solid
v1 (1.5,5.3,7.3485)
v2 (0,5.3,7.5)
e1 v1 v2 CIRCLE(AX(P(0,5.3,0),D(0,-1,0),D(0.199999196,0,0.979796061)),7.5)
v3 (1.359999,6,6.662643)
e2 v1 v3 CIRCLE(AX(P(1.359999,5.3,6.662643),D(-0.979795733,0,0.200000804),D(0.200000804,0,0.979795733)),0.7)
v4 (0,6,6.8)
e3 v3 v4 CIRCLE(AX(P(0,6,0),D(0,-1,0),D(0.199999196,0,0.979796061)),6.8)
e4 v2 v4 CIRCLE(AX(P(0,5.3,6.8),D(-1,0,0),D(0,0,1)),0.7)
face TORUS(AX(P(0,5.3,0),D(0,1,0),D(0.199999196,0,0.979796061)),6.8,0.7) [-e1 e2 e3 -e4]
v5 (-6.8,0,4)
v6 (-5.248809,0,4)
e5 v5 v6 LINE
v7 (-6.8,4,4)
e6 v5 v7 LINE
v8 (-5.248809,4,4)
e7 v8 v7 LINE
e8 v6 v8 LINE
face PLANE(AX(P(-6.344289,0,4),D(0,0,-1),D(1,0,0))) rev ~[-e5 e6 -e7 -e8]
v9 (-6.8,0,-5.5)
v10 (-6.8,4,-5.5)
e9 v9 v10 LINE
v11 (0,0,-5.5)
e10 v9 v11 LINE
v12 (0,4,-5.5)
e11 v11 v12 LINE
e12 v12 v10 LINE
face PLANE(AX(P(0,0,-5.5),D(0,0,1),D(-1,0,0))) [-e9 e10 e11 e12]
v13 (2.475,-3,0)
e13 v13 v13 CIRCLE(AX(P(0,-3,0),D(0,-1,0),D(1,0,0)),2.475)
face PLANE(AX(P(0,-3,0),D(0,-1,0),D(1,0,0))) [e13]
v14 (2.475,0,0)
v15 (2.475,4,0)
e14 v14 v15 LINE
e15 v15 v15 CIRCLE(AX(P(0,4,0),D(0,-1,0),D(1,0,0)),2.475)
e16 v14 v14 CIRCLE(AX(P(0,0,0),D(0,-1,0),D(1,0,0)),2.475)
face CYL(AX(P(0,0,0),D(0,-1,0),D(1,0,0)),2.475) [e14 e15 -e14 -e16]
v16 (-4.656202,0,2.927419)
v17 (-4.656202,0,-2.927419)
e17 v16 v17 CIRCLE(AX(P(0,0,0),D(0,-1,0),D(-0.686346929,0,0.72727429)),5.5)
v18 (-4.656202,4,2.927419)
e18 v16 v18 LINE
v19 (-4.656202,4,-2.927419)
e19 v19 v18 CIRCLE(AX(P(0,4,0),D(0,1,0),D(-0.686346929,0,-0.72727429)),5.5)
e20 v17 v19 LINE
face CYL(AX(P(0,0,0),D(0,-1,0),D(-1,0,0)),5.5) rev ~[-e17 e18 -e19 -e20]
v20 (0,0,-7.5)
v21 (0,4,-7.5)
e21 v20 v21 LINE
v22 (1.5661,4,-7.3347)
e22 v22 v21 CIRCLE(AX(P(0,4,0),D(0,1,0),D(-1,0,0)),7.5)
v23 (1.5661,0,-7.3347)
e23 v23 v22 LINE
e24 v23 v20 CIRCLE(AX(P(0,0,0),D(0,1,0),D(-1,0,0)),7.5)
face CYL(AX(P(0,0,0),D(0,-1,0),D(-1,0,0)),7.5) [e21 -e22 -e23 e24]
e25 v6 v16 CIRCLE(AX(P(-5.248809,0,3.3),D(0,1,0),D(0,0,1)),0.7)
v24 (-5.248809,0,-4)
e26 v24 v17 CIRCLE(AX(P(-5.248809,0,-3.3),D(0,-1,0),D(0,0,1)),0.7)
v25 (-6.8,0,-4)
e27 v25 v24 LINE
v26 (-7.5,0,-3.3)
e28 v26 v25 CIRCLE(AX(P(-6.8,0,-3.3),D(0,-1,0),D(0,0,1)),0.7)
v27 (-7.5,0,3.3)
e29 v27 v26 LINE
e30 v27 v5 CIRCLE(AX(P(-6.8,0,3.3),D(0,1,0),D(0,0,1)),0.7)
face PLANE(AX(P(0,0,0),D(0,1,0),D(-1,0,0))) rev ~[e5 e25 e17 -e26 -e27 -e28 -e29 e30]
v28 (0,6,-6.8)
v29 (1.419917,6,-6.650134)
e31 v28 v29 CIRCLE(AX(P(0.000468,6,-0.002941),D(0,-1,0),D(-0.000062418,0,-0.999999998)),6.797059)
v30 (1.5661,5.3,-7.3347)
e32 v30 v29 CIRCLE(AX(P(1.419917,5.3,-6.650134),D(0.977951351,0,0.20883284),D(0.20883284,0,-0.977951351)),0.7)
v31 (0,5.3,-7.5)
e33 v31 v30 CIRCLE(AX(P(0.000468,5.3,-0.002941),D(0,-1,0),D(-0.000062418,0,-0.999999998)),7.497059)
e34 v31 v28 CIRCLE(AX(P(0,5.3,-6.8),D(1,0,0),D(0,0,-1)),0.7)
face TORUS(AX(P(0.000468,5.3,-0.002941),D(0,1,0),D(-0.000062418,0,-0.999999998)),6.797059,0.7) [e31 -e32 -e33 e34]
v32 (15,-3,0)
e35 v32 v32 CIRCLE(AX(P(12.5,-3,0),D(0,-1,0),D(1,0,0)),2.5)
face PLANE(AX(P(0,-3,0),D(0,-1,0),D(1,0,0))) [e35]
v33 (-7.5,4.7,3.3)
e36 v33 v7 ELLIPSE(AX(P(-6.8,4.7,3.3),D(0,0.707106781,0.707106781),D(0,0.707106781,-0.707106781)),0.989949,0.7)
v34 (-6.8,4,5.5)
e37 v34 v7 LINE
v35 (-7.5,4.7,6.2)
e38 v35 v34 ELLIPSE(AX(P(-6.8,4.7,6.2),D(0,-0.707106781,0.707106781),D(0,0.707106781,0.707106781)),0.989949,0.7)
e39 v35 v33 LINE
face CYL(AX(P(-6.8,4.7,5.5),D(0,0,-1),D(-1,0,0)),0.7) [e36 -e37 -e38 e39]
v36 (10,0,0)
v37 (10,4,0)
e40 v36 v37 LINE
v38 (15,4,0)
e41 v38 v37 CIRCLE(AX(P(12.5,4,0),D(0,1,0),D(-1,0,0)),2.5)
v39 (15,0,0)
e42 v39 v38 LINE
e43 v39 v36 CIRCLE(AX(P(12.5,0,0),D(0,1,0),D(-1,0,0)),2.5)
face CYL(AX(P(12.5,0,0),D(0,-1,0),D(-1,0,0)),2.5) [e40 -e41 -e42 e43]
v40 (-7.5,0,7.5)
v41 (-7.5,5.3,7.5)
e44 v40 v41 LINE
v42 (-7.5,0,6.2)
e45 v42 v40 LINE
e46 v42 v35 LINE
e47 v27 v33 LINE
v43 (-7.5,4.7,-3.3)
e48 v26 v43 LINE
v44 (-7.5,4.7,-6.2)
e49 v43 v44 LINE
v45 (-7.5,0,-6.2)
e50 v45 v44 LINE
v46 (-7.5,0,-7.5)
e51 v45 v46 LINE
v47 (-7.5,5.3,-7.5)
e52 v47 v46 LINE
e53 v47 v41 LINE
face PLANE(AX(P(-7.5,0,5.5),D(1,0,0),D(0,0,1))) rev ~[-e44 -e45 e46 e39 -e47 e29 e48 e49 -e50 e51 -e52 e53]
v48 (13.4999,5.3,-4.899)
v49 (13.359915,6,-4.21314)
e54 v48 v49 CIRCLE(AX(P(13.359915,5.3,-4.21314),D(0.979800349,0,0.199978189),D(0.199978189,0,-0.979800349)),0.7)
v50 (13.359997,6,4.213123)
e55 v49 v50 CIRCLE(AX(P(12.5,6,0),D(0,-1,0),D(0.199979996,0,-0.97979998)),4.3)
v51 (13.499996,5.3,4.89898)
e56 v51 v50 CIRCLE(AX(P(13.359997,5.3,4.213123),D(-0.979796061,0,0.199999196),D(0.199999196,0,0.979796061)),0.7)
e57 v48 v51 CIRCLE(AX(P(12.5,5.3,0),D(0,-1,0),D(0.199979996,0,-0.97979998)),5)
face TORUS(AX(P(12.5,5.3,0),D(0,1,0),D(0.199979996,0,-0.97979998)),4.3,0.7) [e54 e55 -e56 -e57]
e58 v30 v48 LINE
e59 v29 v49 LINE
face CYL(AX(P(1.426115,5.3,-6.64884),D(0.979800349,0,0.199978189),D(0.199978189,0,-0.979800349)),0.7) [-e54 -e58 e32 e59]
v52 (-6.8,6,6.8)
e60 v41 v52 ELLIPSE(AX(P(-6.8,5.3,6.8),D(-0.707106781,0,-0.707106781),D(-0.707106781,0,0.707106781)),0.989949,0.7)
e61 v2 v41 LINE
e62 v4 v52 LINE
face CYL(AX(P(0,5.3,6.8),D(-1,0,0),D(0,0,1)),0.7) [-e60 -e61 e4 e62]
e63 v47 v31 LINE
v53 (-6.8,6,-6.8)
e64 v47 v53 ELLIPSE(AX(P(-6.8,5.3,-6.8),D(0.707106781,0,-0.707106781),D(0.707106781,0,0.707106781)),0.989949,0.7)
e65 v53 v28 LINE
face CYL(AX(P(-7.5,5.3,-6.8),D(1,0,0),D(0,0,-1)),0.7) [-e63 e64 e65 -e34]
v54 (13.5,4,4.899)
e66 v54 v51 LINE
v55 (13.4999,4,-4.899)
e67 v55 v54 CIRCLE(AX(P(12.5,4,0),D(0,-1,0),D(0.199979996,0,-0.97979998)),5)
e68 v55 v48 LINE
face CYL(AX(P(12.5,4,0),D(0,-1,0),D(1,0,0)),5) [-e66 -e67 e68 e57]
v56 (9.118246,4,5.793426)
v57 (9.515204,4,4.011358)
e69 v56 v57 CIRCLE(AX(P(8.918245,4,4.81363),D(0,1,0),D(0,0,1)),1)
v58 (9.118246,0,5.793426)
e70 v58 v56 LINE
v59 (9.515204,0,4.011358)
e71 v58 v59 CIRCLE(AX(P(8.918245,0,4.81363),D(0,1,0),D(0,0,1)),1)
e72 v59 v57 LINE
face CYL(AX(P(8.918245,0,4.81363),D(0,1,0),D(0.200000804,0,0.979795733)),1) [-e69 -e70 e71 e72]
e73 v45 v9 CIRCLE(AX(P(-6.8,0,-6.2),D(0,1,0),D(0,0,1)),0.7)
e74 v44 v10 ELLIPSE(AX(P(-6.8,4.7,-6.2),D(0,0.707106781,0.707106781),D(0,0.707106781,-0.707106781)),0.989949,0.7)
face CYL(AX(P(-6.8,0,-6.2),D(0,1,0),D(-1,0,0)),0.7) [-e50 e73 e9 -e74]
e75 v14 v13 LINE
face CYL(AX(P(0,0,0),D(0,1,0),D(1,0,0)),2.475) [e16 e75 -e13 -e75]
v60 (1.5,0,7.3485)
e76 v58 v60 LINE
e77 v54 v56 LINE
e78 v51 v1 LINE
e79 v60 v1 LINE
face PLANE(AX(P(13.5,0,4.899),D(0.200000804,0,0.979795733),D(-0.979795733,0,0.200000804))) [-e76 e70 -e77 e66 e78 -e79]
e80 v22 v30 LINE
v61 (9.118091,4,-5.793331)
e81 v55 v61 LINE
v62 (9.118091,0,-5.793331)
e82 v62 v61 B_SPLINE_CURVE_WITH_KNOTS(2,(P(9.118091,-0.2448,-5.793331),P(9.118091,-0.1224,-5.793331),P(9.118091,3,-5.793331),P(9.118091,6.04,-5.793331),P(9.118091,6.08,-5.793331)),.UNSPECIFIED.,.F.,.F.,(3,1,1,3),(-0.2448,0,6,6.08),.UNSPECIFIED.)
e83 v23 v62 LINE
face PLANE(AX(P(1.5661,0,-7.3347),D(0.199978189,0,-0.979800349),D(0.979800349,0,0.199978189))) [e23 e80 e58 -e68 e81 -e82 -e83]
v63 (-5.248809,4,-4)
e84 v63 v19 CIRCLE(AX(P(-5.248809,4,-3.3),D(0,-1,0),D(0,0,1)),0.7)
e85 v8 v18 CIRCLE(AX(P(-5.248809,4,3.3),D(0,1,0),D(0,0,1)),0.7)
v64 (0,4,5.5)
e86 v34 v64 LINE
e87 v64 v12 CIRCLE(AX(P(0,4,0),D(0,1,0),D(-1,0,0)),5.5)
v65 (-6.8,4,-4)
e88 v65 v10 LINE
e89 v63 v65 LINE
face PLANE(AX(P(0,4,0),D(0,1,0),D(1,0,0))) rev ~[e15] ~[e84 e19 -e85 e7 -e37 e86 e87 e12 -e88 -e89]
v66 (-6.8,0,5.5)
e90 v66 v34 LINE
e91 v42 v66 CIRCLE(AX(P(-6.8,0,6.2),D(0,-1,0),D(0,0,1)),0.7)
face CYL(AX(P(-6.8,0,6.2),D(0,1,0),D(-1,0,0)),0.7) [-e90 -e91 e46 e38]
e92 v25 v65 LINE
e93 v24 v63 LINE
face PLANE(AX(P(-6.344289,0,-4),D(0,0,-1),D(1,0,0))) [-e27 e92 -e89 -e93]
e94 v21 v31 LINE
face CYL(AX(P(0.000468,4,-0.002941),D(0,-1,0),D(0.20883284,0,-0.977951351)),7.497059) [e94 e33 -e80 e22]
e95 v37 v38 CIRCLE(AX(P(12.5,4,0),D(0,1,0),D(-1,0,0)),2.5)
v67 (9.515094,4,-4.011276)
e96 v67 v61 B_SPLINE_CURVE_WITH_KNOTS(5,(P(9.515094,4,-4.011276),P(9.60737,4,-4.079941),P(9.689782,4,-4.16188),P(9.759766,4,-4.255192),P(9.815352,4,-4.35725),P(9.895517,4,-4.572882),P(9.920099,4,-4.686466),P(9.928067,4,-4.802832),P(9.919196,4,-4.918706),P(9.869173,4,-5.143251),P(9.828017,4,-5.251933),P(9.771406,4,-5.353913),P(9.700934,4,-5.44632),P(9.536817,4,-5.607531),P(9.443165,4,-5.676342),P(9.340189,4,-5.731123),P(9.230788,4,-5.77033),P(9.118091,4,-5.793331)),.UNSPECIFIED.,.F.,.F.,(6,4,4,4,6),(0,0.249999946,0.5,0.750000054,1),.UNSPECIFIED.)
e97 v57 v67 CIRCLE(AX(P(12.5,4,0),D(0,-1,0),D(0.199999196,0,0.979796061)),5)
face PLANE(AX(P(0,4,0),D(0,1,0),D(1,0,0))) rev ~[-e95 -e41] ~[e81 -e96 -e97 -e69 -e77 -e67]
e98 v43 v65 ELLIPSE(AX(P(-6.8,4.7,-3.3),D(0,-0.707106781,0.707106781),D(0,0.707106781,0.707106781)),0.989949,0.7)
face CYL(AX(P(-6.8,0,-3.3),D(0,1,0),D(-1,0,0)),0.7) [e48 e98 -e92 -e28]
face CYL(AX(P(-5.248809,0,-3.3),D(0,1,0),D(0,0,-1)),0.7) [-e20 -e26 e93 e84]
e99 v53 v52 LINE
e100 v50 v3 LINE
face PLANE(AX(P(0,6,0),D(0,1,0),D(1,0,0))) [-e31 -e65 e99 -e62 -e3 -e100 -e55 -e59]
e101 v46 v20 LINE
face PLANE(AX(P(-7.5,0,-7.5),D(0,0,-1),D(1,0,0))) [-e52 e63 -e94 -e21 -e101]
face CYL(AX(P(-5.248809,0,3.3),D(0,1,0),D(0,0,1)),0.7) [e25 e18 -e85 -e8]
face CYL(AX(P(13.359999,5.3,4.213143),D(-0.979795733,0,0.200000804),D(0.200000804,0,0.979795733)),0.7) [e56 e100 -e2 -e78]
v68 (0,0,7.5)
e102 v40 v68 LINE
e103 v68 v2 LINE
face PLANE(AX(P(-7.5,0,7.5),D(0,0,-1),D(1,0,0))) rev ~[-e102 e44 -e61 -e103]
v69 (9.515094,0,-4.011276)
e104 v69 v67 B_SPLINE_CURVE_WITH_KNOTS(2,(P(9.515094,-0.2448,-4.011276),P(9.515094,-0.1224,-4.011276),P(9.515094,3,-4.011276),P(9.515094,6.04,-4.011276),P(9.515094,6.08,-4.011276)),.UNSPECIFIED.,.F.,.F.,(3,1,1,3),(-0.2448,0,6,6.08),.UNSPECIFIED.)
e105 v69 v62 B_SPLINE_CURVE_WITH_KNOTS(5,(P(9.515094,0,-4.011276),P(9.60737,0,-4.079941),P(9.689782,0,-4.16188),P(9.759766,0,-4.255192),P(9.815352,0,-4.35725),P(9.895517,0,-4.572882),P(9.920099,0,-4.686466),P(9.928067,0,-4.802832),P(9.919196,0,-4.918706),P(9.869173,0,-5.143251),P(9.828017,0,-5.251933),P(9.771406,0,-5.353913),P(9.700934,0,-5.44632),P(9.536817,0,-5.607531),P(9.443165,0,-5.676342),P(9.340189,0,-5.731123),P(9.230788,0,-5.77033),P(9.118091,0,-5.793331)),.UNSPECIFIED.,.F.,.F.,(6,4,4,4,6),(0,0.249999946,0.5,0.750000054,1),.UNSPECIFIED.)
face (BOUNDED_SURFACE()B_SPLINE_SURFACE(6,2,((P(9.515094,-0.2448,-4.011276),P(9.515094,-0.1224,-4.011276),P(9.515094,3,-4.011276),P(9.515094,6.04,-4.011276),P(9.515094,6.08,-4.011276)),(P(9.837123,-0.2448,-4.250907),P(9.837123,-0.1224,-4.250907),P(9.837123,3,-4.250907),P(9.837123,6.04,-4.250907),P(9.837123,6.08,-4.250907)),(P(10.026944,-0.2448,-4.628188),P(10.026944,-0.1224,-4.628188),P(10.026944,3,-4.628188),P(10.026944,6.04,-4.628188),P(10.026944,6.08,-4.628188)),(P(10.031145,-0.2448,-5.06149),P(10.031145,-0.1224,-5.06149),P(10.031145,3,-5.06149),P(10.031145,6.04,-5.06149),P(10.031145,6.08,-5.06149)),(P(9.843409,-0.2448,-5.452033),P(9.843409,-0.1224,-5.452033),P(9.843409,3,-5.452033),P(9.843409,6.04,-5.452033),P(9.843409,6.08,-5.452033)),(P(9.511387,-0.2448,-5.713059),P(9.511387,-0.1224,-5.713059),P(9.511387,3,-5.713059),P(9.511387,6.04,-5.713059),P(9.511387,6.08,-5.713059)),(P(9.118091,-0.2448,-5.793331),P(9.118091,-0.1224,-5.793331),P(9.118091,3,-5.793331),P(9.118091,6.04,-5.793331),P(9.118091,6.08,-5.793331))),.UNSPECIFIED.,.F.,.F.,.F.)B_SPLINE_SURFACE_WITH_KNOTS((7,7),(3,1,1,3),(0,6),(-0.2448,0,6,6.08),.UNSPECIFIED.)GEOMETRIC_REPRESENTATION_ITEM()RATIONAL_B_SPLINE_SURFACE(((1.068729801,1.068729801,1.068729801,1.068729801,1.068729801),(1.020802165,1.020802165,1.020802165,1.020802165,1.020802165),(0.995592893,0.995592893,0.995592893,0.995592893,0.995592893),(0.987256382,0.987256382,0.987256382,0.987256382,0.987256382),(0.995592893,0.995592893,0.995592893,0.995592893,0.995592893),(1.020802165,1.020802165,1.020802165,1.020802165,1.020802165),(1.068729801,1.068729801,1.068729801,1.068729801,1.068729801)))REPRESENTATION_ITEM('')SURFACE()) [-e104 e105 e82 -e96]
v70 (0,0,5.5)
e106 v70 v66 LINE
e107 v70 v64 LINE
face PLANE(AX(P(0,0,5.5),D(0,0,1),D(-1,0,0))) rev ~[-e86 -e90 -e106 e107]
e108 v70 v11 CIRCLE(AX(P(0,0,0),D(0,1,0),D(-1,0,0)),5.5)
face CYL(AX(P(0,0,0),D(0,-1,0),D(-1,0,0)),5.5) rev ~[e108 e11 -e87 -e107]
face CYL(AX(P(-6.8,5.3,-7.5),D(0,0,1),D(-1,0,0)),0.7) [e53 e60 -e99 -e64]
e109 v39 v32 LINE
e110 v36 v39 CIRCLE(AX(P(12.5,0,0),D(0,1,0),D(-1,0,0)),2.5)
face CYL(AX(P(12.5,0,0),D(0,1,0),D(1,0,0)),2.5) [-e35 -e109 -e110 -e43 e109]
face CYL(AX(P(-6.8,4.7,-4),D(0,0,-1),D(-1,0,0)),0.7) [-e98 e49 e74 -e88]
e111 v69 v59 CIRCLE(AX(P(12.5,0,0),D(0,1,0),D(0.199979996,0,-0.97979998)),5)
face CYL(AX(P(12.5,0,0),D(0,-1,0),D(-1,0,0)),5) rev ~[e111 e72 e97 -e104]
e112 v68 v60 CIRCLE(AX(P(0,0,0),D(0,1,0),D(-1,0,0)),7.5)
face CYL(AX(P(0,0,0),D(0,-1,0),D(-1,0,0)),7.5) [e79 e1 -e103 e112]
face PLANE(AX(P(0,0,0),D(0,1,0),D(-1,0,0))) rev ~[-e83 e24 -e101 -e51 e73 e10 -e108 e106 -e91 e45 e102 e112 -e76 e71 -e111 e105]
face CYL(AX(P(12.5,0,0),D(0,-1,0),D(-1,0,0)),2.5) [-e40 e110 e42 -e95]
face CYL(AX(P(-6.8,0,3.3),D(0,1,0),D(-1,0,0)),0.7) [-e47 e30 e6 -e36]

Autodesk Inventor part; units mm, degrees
ref_plane "YZ Plane" through (0, 0, 0) normal (1, 0, 0) x (0, 1, 0)
ref_plane "XZ Plane" through (0, 0, 0) normal (0, 1, 0) x (-1, 0, 0)
ref_plane "XY Plane" through (0, 0, 0) normal (0, 0, 1) x (1, 0, 0)
sketch "Эскиз3" plane through (0, 0, 0) normal (0, 1, 0) x (-1, 0, 0)
  circle A0 centre (0, 0) radius 5.5
  circle A1 centre (0, 0) radius 7.5
  line L0 (7.5, 0) -> (7.5, 7.5)
  line L1 (7.5, 7.5) -> (0, 7.5)
  line L2 (0, 7.5) -> (7.5, 7.5)
  line L3 (7.5, 7.5) -> (7.5, -7.5)
  line L4 (7.5, -7.5) -> (0, -7.5)
  line L5 (0, -7.5) -> (0, 7.5)
  line L6 (-7.5, 0) -> (-12.5, 0)
  circle A2 centre (-12.5, 0) radius 2.5
  circle A3 centre (-12.5, 0) radius 5
  line L7 (-1.5661, -7.3347) -> (-13.4999, -4.899)
  line L8 (-13.5, 4.899) -> (-1.5, 7.3485)
  line L9 (0, 5.5) -> (7.5, 5.5)
  line L10 (0, -5.5) -> (7.5, -5.5)
  line L11 (7.5, -5.5) -> (7.5, -4)
  line L12 (7.5, -4) -> (3.7749, -4)
  line L13 (7.5, 5.5) -> (7.5, 4)
  line L14 (7.5, 4) -> (3.7749, 4)
  circle A4 centre (0, 0) radius 2.45
  dimension "d9" = 11
  dimension "d10" = 15
  dimension "d11" = 5
  dimension "d12" = 5
  dimension "d13" = 1.5
  dimension "d14" = 1.5
  dimension "d17" = 4.9
extrude "Выдавливание3" add sketch "Эскиз3" along normal blind 4 contours A0 L14 A1 L12 | A0 L5 A1 | L5 A1 L9 | L14 L0 A1 | L10 A1 L5 | A1 L3 L12 | L1 L0 L9 A1 | A4 L5 | L5 A4 | A1 L10 L3 L4 | A1 A3 L8 | L7 A3 A1 | A2
sketch "Эскиз4" plane through (0, 4, 0) normal (0, 1, 0) x (1, 0, 0)
  circle A0 centre (12.5, 0) radius 2.5 projected
  line L0 (1.5, -7.3485) -> (13.5, -4.899) projected
  circle A1 centre (12.5, 0) radius 5
  line L1 (-7.5, 7.5) -> (-7.5, 5.5) projected
  line L2 (-7.5, -7.5) -> (0, -7.5) projected
  line L3 (-7.5, 7.5) -> (-7.5, -7.5)
  line L4 (-7.5, -7.5) -> (0, -7.5)
  line L5 (1.5, -7.3485) -> (13.5, -4.899)
  arc A2 (1.5661, 7.3347) -> (0, 7.5) centre (0, 0) ccw projected
  line L6 (13.4999, 4.899) -> (1.5661, 7.3347) projected
  line L7 (1.5661, 7.3347) -> (13.4999, 4.899)
  line L8 (-7.5, 7.5) -> (0, 7.5)
  line L9 (0, 7.5) -> (-7.5, 7.5) projected
  circle A3 centre (0, 0) radius 7.5
  point P0 (0, 7.5)
extrude "Выдавливание4" add sketch "Эскиз4" along normal blind 2 contours A0 | A3 A1 L0 | A3 A2 | A1 | L2 L3 A3 | A3 L6 A1 | L3 L1 L8 A3
fillet "Сопряжение1" radius 1 2 edges at (13.5, 2, 4.899) (13.4999, 2, -4.899)
sketch "Эскиз5" plane through (0, 0, 0) normal (0, -1, 0) x (1, 0, 0)
  circle A0 centre (0, 0) radius 2.475
  circle A1 centre (12.5, 0) radius 2.5 projected
  circle A2 centre (12.5, 0) radius 2.5
  dimension "d25" = 4.95
extrude "Выдавливание5" add sketch "Эскиз5" along normal blind 3 and the other way blind 5
fillet "Сопряжение3" radius 0.7 16 edges at (17.5, 6, -0.0001) (7.533, 6, -6.1168) (0.7538, 6, 7.462) (-3.75, 6, 7.5) (7.5, 6, 6.1237) (-7.5, 6, 0) (0.7874, 6, -7.4586) (-3.75, 6, -7.5) (-3.7749, 2, 4) (-3.7749, 2, -4) (-7.5, 2, -4) (-7.5, 2, -5.5) (-7.5, 4, -4.75) (-7.5, 2, 5.5) (-7.5, 2, 4) (-7.5, 4, 4.75)
properties part number "block_01"
